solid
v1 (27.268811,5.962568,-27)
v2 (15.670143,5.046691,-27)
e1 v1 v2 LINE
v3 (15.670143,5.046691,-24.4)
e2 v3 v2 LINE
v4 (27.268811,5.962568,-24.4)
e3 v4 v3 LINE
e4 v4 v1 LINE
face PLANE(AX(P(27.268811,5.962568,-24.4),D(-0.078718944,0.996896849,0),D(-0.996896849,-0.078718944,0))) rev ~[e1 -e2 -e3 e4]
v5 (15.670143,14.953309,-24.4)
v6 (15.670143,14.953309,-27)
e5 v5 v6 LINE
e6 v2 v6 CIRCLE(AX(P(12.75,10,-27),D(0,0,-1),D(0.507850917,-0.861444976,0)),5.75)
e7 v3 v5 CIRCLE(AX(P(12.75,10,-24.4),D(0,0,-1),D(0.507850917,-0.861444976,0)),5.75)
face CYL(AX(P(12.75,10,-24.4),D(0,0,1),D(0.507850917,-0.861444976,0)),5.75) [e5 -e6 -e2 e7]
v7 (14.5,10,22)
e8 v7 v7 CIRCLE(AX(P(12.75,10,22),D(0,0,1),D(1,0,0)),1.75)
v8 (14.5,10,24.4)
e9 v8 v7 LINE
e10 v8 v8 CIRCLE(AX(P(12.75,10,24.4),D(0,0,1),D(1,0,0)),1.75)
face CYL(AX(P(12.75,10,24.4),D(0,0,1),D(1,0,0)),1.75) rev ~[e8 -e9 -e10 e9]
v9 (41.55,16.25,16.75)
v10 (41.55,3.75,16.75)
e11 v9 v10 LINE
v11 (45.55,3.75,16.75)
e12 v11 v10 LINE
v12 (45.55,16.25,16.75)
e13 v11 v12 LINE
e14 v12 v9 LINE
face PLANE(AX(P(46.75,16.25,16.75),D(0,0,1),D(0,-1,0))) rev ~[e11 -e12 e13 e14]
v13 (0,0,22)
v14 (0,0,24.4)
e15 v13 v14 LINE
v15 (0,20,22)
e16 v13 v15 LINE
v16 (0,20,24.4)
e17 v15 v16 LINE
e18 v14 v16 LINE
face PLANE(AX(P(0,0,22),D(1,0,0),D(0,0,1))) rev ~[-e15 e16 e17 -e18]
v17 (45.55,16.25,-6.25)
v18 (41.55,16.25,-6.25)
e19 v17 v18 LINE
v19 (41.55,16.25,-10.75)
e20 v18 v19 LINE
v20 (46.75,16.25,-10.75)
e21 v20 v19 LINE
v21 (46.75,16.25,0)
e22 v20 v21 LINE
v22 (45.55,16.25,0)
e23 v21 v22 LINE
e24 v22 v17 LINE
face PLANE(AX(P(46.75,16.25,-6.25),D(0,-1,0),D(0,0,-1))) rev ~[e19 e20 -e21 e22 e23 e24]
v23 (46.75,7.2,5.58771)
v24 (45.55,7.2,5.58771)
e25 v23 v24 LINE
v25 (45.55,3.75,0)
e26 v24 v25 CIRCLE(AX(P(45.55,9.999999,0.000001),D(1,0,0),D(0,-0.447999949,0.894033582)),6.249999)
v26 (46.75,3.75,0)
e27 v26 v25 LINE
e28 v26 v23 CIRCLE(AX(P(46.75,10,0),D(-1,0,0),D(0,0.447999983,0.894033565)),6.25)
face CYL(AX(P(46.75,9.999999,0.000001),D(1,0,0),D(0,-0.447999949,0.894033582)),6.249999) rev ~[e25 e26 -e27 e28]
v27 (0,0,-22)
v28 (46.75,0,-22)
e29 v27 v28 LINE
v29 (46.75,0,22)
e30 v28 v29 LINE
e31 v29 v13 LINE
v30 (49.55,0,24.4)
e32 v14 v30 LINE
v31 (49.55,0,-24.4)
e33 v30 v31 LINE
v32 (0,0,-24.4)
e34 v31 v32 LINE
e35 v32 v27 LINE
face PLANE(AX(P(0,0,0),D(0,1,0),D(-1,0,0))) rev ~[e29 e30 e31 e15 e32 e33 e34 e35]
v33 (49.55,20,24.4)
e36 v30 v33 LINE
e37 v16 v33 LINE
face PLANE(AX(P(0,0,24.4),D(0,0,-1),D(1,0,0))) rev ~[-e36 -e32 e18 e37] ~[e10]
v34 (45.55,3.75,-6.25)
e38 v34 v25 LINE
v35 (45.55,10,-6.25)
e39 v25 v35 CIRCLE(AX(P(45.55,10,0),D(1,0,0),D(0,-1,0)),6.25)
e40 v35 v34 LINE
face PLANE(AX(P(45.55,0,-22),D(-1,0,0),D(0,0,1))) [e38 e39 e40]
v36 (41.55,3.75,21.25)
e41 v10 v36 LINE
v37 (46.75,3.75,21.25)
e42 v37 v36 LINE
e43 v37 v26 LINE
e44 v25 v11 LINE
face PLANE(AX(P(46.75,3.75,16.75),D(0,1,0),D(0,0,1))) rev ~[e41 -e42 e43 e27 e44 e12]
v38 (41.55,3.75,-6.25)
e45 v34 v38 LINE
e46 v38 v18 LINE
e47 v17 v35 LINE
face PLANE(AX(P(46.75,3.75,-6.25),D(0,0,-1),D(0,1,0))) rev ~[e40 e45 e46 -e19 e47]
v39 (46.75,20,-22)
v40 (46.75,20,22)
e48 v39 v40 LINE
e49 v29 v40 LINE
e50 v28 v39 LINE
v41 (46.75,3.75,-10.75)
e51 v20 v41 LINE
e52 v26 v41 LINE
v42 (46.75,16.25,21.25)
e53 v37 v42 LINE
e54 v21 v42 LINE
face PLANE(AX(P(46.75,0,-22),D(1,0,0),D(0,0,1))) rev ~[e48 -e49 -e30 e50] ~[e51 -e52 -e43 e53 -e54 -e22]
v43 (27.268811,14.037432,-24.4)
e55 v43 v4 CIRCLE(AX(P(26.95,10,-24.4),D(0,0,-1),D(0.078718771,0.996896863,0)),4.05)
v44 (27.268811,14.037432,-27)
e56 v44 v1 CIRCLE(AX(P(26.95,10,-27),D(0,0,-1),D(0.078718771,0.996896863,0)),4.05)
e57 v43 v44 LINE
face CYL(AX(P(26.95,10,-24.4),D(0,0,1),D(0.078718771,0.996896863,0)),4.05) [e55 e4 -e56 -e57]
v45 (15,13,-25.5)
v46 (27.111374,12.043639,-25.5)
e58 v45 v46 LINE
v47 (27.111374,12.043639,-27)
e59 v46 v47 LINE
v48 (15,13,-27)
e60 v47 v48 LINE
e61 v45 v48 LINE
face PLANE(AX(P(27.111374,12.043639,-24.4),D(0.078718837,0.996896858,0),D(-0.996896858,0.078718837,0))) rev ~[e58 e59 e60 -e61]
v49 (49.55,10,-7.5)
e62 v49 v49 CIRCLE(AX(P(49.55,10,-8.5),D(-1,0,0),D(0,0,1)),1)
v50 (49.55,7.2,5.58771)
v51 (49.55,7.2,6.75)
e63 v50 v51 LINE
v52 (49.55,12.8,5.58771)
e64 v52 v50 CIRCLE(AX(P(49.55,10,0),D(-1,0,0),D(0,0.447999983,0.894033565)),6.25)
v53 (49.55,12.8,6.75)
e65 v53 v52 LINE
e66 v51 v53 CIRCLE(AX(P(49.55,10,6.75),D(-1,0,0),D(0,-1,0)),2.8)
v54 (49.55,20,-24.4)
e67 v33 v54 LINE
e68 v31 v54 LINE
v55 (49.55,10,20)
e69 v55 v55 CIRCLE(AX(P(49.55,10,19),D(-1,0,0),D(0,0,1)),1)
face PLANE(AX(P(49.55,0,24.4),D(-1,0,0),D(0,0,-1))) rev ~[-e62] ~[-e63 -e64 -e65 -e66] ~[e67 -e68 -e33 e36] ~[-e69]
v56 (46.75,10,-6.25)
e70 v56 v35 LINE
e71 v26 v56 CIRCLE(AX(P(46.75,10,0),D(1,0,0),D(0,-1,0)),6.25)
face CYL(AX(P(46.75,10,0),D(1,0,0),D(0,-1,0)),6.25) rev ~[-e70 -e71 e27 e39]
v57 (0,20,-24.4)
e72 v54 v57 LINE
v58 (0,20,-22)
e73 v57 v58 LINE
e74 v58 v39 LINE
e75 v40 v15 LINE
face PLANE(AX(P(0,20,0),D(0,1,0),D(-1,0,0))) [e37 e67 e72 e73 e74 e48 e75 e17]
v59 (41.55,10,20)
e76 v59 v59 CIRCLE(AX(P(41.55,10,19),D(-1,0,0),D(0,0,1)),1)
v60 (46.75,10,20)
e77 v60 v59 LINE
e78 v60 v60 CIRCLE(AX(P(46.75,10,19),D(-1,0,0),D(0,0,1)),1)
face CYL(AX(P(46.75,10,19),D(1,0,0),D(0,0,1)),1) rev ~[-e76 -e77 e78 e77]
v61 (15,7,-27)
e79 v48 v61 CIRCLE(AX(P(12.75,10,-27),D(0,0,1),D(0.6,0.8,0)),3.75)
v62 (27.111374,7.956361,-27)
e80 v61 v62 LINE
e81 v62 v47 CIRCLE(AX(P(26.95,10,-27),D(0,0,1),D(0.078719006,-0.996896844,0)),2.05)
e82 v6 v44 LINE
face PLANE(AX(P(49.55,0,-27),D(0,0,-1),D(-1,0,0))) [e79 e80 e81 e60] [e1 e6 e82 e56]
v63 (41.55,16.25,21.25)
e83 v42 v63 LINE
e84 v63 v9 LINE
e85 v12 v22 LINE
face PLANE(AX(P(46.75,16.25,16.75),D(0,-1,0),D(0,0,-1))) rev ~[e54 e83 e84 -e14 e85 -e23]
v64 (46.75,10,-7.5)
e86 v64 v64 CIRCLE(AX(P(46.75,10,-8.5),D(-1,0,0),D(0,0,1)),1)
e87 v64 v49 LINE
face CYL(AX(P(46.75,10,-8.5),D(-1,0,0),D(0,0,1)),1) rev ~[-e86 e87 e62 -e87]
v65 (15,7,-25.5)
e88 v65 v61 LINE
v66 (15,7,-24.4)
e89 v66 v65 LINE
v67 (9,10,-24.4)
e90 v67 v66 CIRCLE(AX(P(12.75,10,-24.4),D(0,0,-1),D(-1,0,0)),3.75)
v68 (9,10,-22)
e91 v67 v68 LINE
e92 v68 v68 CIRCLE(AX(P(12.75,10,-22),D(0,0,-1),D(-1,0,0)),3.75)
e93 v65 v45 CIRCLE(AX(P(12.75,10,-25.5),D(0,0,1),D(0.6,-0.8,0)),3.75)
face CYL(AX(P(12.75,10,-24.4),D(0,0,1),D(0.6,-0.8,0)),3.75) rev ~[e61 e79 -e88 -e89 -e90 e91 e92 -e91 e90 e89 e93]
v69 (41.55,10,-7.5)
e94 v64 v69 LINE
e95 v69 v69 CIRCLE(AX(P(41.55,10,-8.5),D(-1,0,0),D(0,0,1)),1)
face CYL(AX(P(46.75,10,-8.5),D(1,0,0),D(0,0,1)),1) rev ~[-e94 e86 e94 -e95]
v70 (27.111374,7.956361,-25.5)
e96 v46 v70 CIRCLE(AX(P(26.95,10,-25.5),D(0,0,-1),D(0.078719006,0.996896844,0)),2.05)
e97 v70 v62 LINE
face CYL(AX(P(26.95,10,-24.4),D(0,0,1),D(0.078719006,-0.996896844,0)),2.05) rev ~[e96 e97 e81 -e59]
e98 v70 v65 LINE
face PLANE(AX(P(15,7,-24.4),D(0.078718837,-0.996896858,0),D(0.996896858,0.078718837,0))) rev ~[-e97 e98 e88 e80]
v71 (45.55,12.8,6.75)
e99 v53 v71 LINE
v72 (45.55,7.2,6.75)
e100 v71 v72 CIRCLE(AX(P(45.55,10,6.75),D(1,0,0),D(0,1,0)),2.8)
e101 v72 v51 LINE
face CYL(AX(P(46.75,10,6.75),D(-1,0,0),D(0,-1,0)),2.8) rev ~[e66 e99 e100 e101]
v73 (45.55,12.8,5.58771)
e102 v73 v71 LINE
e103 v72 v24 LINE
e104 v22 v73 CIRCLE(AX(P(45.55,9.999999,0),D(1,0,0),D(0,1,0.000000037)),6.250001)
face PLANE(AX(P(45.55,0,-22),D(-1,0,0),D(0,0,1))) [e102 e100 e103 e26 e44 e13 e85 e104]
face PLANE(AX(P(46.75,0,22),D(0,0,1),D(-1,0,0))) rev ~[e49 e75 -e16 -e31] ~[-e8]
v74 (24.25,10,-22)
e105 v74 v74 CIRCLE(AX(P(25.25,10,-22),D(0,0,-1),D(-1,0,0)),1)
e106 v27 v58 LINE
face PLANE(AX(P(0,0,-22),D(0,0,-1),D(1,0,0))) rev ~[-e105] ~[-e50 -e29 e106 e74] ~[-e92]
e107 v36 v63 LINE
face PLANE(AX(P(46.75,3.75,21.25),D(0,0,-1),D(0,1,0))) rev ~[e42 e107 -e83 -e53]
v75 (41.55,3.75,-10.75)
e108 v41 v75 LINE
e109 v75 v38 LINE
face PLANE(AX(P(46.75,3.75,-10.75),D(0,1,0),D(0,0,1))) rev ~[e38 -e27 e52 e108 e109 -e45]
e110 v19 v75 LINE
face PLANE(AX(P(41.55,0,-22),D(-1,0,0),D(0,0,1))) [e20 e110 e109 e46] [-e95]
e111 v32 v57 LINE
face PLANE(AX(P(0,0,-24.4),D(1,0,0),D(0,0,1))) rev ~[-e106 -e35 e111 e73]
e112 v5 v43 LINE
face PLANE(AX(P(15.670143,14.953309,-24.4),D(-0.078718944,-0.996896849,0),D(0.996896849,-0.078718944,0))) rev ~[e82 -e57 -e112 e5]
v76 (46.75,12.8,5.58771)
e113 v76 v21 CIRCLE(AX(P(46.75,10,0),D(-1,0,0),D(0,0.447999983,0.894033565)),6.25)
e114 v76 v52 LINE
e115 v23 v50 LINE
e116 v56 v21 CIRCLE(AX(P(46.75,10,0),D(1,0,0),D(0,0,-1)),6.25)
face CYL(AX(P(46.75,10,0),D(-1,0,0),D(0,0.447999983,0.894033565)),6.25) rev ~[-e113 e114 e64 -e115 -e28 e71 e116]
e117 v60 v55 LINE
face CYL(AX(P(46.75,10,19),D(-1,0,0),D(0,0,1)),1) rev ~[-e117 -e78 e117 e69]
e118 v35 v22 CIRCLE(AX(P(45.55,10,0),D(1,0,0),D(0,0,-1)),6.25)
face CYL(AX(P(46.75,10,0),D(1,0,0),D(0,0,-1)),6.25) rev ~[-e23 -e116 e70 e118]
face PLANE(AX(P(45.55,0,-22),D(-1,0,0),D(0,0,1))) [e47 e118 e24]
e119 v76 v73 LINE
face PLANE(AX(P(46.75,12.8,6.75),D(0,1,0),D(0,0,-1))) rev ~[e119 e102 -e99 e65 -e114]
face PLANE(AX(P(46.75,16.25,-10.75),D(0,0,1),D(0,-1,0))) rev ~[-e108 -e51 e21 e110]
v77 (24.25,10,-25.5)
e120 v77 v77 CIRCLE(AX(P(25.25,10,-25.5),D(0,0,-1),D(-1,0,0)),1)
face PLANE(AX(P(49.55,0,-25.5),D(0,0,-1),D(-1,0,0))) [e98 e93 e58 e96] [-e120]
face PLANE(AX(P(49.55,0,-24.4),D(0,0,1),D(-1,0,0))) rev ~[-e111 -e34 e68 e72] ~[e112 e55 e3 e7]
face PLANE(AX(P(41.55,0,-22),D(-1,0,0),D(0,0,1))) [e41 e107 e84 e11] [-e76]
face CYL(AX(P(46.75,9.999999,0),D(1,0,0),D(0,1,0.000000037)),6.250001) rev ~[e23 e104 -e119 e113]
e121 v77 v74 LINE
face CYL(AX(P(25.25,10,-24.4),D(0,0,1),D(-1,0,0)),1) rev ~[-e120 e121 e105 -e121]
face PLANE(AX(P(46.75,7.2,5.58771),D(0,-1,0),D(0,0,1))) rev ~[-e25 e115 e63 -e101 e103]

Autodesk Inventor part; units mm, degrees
ref_plane "YZ Plane" through (0, 0, 0) normal (1, 0, 0) x (0, 1, 0)
ref_plane "XZ Plane" through (0, 0, 0) normal (0, 1, 0) x (-1, 0, 0)
ref_plane "XY Plane" through (0, 0, 0) normal (0, 0, 1) x (1, 0, 0)
sketch "スケッチ1" plane through (0, 0, 0) normal (0, 1, 0) x (-1, 0, 0)
  line L0 (0, 40.53276) -> (0, -53.904718)
  line L1 (35.916481, 0) -> (-80.691414, 0)
  line L2 (0, -24.4) -> (-49.55, -24.4)
  line L3 (-49.55, -24.4) -> (-49.55, 24.4)
  line L4 (-49.55, 24.4) -> (0, 24.4)
  line L5 (0, 24.4) -> (0, 22)
  line L6 (0, 22) -> (-46.75, 22)
  line L7 (-46.75, 22) -> (-46.75, -22)
  line L8 (-46.75, -22) -> (0, -22)
  line L9 (0, -24.4) -> (0, -22)
  line L10 (-12.75, -24.4) -> (-12.75, 24.4)
  point P0 (0, 0)
  dimension "d0" = 44
  dimension "d1" = 2.4
  dimension "d2" = 12.75
  dimension "d3" = 34
  dimension "d4" = 2.8
  dimension "d5" = 2.4
sketch "スケッチ1 outline for 押し出し1" plane through (0, 0, 0) normal (0, 1, 0) x (-1, 0, 0)
  line L0 (0, -22) -> (-46.75, -22)
  line L1 (0, -24.4) -> (0, -22)
  line L2 (-49.55, -24.4) -> (0, -24.4)
  line L3 (-49.55, 24.4) -> (-49.55, -24.4)
  line L4 (0, 24.4) -> (-49.55, 24.4)
  line L5 (0, 22) -> (0, 24.4)
  line L6 (-46.75, 22) -> (0, 22)
  line L7 (-46.75, -22) -> (-46.75, 22)
extrude "押し出し1" add sketch "スケッチ1 outline for 押し出し1" along normal blind 20
sketch "スケッチ2" plane through (49.55, 0, -24.4) normal (0, 0, -1) x (-1, 0, 0)
  line L0 (49.55, 20) -> (2.8, 20)
  line L1 (36.8, 20) -> (36.8, 0)
  line L2 (0, 0) -> (49.55, 0)
  line L3 (49.55, 0) -> (49.55, 20)
  line L4 (49.55, 10) -> (0, 10)
  line L5 (0, 0) -> (0, 20)
  circle A0 centre (36.8, 10) radius 3.75
  arc A1 (22.438626, 12.043639) -> (22.438626, 7.956361) centre (22.6, 10) ccw
  line L6 (34.55, 13) -> (22.438626, 12.043639)
  line L7 (34.55, 7) -> (22.438626, 7.956361)
  circle A2 centre (24.3, 10) radius 1
  circle A3 centre (36.8, 10) radius 5.75
  line L8 (33.879857, 14.953309) -> (22.281189, 14.037432)
  arc A4 (22.281189, 14.037432) -> (22.281189, 5.962568) centre (22.6, 10) ccw
  line L9 (22.281189, 5.962568) -> (33.879857, 5.046691)
  dimension "d9" = 7.5
  dimension "d8" = 12.75
  dimension "d10" = 2.05
  dimension "d11" = 14.2
  dimension "d12" = 12.5
  dimension "d13" = 2
  dimension "d14" = 6
  dimension "d43" = 2
  dimension "d44" = 2
sketch "スケッチ2 outline for 押し出し2" plane through (49.55, 0, -24.4) normal (0, 0, -1) x (-1, 0, 0)
  circle A0 centre (36.8, 10) radius 3.75
  circle A1 centre (24.3, 10) radius 1
extrude "押し出し2" cut sketch "スケッチ2 outline for 押し出し2" against normal up to surface (2.4 mm away)
sketch "スケッチ2 outline for 押し出し7" plane through (49.55, 0, -24.4) normal (0, 0, -1) x (-1, 0, 0)
  arc A0 (33.879857, 5.046691) -> (33.879857, 14.953309) centre (36.8, 10) ccw
  line L0 (22.281189, 5.962568) -> (33.879857, 5.046691)
  line L1 (33.879857, 14.953309) -> (22.281189, 14.037432)
  arc A1 (22.281189, 14.037432) -> (22.281189, 5.962568) centre (22.6, 10) ccw
  arc A2 (34.55, 13) -> (34.55, 7) centre (36.8, 10) cw
  line L2 (22.438626, 12.043639) -> (34.55, 13)
  arc A3 (22.438626, 7.956361) -> (22.438626, 12.043639) centre (22.6, 10) cw
  line L3 (34.55, 7) -> (22.438626, 7.956361)
extrude "押し出し7" add sketch "スケッチ2 outline for 押し出し7" along normal blind 2.6
sketch "スケッチ2 outline for 押し出し3" plane through (49.55, 0, -24.4) normal (0, 0, -1) x (-1, 0, 0)
  arc A0 (34.55, 7) -> (34.55, 13) centre (36.8, 10) cw
  line L0 (22.438626, 7.956361) -> (34.55, 7)
  line L1 (34.55, 13) -> (22.438626, 12.043639)
  arc A1 (22.438626, 12.043639) -> (22.438626, 7.956361) centre (22.6, 10) ccw
  circle A2 centre (24.3, 10) radius 1
extrude "押し出し3" add sketch "スケッチ2 outline for 押し出し3" along normal blind 1.1
sketch "スケッチ3" plane through (0, 0, 24.4) normal (0, 0, 1) x (1, 0, 0)
  circle A0 centre (12.75, 10) radius 3.75 projected
  circle A1 centre (12.75, 10) radius 1.75
  point P0 (0, 0)
  dimension "d19" = 3.5
sketch "スケッチ3 outline for 押し出し4" plane through (0, 0, 24.4) normal (0, 0, 1) x (1, 0, 0)
  circle A0 centre (12.75, 10) radius 1.75
extrude "押し出し4" cut sketch "スケッチ3 outline for 押し出し4" against normal up to surface (2.4 mm away)
sketch "スケッチ4" plane through (46.75, 0, -22) normal (-1, 0, 0) x (0, 0, 1)
  line L0 (22, 0) -> (22, 20)
  line L1 (0, 0) -> (0, 20)
  line L2 (0, 10) -> (44, 10)
  line L3 (44, 0) -> (44, 20)
  line L4 (43.25, 16.25) -> (11.25, 16.25)
  line L5 (11.25, 16.25) -> (11.25, 3.75)
  line L6 (11.25, 3.75) -> (43.25, 3.75)
  line L7 (43.25, 3.75) -> (43.25, 16.25)
  line L8 (15.75, 16.25) -> (15.75, 3.75)
  line L9 (38.75, 16.25) -> (38.75, 3.75)
  circle A0 centre (13.5, 10) radius 1
  circle A1 centre (41, 10) radius 1
  arc A2 (27.58771, 12.8) -> (27.58771, 7.2) centre (22, 10) ccw
  arc A3 (28.75, 7.2) -> (28.75, 12.8) centre (28.75, 10) ccw
  line L10 (28.75, 12.8) -> (27.58771, 12.8)
  line L11 (28.75, 7.2) -> (27.58771, 7.2)
  line L12 (15.75, 3.75) -> (15.75, 10)
  point P0 (22, 10)
  point P1 (15.75, 10)
  point P2 (22, 3.75)
  point P3 (22, 16.25)
  dimension "d22" = 4.5
  dimension "d23" = 4.5
  dimension "d24" = 23
  dimension "d25" = 12.5
  dimension "d29" = 2
  dimension "d30" = 2.25
  dimension "d31" = 2.25
  dimension "d39" = 13
  dimension "d40" = 2.8
sketch "スケッチ4 outline for 押し出し5" plane through (46.75, 0, -22) normal (-1, 0, 0) x (0, 0, 1)
  circle A0 centre (41, 10) radius 1
  circle A1 centre (13.5, 10) radius 1
  arc A2 (27.58771, 12.8) -> (27.58771, 7.2) centre (22, 10) ccw
  line L0 (28.75, 12.8) -> (27.58771, 12.8)
  arc A3 (28.75, 7.2) -> (28.75, 12.8) centre (28.75, 10) ccw
  line L1 (27.58771, 7.2) -> (28.75, 7.2)
extrude "押し出し5" cut sketch "スケッチ4 outline for 押し出し5" against normal through all
sketch "スケッチ4 outline for 押し出し8" plane through (46.75, 0, -22) normal (-1, 0, 0) x (0, 0, 1)
  line L0 (15.75, 10) -> (15.75, 3.75)
  arc A0 (22, 3.75) -> (15.75, 10) centre (22, 10) cw
  line L1 (15.75, 3.75) -> (22, 3.75)
  arc A1 (15.75, 10) -> (22, 16.25) centre (22, 10) cw
  line L2 (15.75, 16.25) -> (15.75, 10)
  line L3 (22, 16.25) -> (15.75, 16.25)
  line L4 (28.75, 7.2) -> (27.58771, 7.2)
  arc A2 (28.75, 12.8) -> (28.75, 7.2) centre (28.75, 10) cw
  line L5 (27.58771, 12.8) -> (28.75, 12.8)
  arc A3 (22, 16.25) -> (27.58771, 12.8) centre (22, 10) cw
  line L6 (38.75, 16.25) -> (22, 16.25)
  line L7 (38.75, 3.75) -> (38.75, 16.25)
  line L8 (22, 3.75) -> (38.75, 3.75)
  arc A4 (27.58771, 7.2) -> (22, 3.75) centre (22, 10) cw
extrude "押し出し8" add sketch "スケッチ4 outline for 押し出し8" along normal blind 1.2 contours A0 L1 L0 | L2 L3 A1 | A4 L4 A2 L5 A3 L6 L7 L8
sketch "スケッチ4 outline for 押し出し6" plane through (46.75, 0, -22) normal (-1, 0, 0) x (0, 0, 1)
  line L0 (43.25, 3.75) -> (43.25, 16.25)
  line L1 (38.75, 3.75) -> (43.25, 3.75)
  line L2 (43.25, 16.25) -> (38.75, 16.25)
  line L3 (38.75, 16.25) -> (38.75, 3.75)
  circle A0 centre (41, 10) radius 1
  line L4 (15.75, 3.75) -> (15.75, 16.25)
  line L5 (11.25, 3.75) -> (15.75, 3.75)
  line L6 (15.75, 16.25) -> (11.25, 16.25)
  line L7 (11.25, 16.25) -> (11.25, 3.75)
  circle A1 centre (13.5, 10) radius 1
extrude "押し出し6" add sketch "スケッチ4 outline for 押し出し6" along normal blind 5.2
properties part number "joint3"
